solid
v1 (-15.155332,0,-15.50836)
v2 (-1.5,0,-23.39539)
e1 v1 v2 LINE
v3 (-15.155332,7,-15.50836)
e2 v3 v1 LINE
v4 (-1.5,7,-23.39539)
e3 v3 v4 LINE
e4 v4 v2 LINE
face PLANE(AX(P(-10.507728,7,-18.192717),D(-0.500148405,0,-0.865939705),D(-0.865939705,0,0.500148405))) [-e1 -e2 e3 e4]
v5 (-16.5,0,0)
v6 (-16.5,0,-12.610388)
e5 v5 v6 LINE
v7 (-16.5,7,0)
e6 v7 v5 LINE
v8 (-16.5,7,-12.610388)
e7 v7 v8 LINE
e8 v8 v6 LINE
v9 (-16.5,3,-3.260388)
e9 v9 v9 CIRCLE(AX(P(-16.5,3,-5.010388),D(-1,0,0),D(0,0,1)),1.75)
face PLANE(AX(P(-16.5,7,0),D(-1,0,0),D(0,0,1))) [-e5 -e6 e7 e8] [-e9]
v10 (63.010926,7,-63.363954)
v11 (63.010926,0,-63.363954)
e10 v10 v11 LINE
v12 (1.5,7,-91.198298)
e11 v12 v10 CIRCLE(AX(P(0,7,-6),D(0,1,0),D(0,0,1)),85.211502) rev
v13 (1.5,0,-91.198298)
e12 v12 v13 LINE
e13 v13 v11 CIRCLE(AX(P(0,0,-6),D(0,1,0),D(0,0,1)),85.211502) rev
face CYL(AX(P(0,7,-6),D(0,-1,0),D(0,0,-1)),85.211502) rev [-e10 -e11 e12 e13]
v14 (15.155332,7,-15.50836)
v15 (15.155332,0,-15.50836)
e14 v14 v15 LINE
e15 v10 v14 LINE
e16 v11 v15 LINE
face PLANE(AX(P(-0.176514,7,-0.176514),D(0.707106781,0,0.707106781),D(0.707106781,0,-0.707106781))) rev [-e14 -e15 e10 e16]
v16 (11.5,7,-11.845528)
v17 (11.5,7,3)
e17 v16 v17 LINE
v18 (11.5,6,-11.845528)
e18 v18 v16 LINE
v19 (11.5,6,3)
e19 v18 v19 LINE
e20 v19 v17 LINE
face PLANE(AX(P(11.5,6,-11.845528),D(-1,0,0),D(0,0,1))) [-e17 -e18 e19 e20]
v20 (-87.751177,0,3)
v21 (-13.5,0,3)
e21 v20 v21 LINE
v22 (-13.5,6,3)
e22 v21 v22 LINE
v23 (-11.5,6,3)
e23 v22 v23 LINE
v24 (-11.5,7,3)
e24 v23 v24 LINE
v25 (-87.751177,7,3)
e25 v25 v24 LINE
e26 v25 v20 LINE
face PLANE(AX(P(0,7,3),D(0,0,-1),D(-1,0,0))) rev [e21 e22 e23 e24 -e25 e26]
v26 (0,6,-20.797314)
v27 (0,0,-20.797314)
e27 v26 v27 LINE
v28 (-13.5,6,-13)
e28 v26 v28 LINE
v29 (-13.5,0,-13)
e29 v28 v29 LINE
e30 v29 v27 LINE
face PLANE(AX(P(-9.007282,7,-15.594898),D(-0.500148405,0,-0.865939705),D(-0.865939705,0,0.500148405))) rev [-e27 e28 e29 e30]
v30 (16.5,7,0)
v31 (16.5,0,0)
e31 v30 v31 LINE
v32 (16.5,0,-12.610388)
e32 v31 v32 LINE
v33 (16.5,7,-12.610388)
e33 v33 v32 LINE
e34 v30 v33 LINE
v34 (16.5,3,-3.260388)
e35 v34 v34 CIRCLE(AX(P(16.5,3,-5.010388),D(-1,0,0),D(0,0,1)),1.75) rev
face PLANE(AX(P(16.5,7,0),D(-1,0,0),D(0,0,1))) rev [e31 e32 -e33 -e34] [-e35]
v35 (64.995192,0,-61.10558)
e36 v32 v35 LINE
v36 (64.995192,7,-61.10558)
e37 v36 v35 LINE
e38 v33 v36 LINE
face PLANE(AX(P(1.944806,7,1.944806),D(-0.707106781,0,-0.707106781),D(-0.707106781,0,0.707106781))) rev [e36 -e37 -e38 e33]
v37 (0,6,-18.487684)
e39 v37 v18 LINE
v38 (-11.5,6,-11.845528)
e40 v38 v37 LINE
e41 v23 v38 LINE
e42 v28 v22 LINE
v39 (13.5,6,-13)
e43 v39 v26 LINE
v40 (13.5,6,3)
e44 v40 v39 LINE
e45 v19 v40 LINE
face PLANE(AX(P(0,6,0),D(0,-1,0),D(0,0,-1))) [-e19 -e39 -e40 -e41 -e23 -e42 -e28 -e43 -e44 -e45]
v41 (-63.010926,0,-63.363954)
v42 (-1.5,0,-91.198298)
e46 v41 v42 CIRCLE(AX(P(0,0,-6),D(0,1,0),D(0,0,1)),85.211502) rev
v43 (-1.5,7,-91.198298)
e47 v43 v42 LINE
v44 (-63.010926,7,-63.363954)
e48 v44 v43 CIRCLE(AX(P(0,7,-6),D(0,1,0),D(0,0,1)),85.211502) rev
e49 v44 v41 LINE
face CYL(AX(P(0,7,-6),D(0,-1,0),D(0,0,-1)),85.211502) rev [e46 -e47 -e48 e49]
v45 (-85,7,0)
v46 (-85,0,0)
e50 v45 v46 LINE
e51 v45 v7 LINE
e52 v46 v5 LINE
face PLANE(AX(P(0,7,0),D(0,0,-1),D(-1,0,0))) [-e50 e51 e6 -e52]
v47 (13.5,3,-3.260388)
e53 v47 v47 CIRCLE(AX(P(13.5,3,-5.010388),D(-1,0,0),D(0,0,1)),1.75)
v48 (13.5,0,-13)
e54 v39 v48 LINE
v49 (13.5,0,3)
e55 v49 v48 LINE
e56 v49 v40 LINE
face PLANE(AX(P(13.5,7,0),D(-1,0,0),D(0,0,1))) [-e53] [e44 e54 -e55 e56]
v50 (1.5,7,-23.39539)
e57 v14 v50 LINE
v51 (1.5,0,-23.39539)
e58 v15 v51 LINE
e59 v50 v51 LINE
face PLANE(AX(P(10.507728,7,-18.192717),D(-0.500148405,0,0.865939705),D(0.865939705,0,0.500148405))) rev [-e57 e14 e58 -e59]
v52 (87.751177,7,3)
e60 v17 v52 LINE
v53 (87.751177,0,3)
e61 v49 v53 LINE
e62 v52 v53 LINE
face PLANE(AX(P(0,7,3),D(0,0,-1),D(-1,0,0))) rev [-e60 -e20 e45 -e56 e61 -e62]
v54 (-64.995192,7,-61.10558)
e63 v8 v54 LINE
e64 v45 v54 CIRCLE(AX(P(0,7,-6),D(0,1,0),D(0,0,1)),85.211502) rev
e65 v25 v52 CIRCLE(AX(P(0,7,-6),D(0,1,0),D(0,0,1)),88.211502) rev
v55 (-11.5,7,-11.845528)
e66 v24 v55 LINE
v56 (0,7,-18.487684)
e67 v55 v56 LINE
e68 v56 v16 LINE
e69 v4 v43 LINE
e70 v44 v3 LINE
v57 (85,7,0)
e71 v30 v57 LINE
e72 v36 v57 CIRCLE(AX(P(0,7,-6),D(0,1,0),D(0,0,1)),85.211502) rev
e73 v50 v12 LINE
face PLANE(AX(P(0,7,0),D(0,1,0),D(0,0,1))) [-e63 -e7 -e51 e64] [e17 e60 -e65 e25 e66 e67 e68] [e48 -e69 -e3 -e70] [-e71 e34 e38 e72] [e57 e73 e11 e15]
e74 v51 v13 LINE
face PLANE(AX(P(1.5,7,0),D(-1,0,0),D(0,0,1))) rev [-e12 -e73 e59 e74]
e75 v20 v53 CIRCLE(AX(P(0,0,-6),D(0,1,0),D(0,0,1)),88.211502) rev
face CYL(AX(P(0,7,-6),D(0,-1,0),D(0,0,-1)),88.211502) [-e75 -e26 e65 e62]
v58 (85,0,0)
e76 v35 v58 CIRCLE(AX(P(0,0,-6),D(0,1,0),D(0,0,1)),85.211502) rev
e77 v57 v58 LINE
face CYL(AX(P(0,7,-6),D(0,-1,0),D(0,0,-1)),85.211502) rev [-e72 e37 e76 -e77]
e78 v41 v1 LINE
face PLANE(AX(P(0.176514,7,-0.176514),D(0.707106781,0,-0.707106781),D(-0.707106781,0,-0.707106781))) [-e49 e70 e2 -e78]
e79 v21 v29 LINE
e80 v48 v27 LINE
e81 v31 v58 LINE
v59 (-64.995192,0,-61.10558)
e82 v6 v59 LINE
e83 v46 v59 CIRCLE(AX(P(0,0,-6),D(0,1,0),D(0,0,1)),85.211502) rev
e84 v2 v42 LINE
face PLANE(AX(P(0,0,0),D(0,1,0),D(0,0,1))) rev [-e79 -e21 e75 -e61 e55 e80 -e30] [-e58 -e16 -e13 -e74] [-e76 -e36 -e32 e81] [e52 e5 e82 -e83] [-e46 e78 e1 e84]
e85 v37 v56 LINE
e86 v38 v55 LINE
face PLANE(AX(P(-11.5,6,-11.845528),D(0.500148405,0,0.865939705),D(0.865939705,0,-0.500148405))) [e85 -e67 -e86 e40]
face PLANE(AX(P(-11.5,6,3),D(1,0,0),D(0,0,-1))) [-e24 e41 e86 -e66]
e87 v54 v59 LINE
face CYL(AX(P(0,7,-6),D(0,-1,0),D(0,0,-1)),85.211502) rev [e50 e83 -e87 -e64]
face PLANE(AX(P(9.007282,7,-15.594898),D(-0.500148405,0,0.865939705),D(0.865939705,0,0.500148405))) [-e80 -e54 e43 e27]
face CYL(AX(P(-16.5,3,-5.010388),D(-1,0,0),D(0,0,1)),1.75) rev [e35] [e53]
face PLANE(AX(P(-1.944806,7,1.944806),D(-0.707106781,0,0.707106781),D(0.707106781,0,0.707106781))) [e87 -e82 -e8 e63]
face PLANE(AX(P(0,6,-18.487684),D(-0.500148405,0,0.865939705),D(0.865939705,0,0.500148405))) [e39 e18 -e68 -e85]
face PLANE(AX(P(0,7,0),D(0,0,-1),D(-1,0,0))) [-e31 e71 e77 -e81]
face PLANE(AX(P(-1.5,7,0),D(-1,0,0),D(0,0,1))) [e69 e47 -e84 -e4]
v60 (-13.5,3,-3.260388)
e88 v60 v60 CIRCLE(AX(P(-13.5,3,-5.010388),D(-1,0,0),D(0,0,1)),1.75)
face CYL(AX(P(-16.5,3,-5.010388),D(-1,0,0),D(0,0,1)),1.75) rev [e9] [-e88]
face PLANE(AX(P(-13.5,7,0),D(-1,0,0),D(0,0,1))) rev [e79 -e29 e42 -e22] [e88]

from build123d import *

# Parameters (mm, degrees)
BOSS_EXTRUDE2_DEPTH                = 7
SKETCH3_W                          = 27
SKETCH3_H                          = 3
CUT_EXTRUDE2_DEPTH                 = 10
F_3_5_START                        = -16.5
F_3_5_3_5_DIAMETER_HOLE1_OUTLINE_R = 1.75
F_3_5_3_5_DIAMETER_HOLE1_DEPTH     = 33
BOSS_EXTRUDE4_DEPTH                = 1


# Read off the part's stored shape, not the designer's step: Ø3.5 (3.5) Diameter Hole1
with BuildPart() as part:
    # Sketch1 → Boss-Extrude2 (new body)
    # profile 1 of 5: a face of its own
    with BuildSketch(Plane(origin=(0, 0, 0), x_dir=(1, 0, 0), z_dir=(0, 1, 0))):
        with BuildLine():
            ThreePointArc((87.751176684, -3), (0, 94.211501571), (-87.751176684, -3))
            Line((-87.751176684, -3), (87.751176684, -3))
        make_face()
        with BuildLine():
            Line((-16.5, 0), (-85, 0))
            ThreePointArc((-85, 0), (-80.982173458, 32.512027121), (-64.995192411, 61.105580148))
            ThreePointArc((-64.995192411, 61.105580148), (-64.013019257, 62.243518432), (-63.01092574, 63.363954164))
            ThreePointArc((-63.01092574, 63.363954164), (-35.129795909, 83.633095001), (-1.5, 91.198298105))
            ThreePointArc((-1.5, 91.198298105), (0, 91.211501571), (1.5, 91.198298105))
            ThreePointArc((1.5, 91.198298105), (35.129795909, 83.633095001), (63.01092574, 63.363954164))
            ThreePointArc((63.01092574, 63.363954164), (64.013019257, 62.243518432), (64.995192411, 61.105580148))
            ThreePointArc((64.995192411, 61.105580148), (80.982173458, 32.512027121), (85, 0))
            Line((85, 0), (16.5, 0))
            Line((16.5, 0), (13.5, 0))
            Line((13.5, 0), (-13.5, 0))
            Line((-13.5, 0), (-16.5, 0))
        make_face(mode=Mode.SUBTRACT)
    # profile 2 of 5: a face of its own
    with BuildSketch(Plane(origin=(0, 0, 0), x_dir=(1, 0, 0), z_dir=(0, 1, 0))):
        with BuildLine():
            Line((16.5, 14.73170808), (16.5, 12.610387736))
            Line((16.5, 12.610387736), (64.995192411, 61.105580148))
            ThreePointArc((64.995192411, 61.105580148), (64.013019257, 62.243518432), (63.01092574, 63.363954164))
            Line((63.01092574, 63.363954164), (15.155331601, 15.508360024))
            Line((15.155331601, 15.508360024), (16.5, 14.73170808))
        make_face()
    # profile 3 of 5: a face of its own
    with BuildSketch(Plane(origin=(0, 0, 0), x_dir=(1, 0, 0), z_dir=(0, 1, 0))):
        with BuildLine():
            ThreePointArc((1.5, 91.198298105), (0, 91.211501571), (-1.5, 91.198298105))
            Line((-1.5, 91.198298105), (-1.5, 23.395389902))
            Line((-1.5, 23.395389902), (0, 24.261758084))
            Line((0, 24.261758084), (1.5, 23.395389902))
            Line((1.5, 23.395389902), (1.5, 91.198298105))
        make_face()
    # profile 4 of 5: a face of its own
    with BuildSketch(Plane(origin=(0, 0, 0), x_dir=(1, 0, 0), z_dir=(0, 1, 0))):
        with BuildLine():
            ThreePointArc((-63.01092574, 63.363954164), (-64.013019257, 62.243518432), (-64.995192411, 61.105580148))
            Line((-64.995192411, 61.105580148), (-16.5, 12.610387736))
            Line((-16.5, 12.610387736), (-16.5, 14.73170808))
            Line((-16.5, 14.73170808), (-15.155331601, 15.508360024))
            Line((-15.155331601, 15.508360024), (-63.01092574, 63.363954164))
        make_face()
    # profile 5 of 5: a face of its own
    with BuildSketch(Plane(origin=(0, 0, 0), x_dir=(1, 0, 0), z_dir=(0, 1, 0))):
        Polygon((-16.5, 12.610387736), (-16.5, 0), (-13.5, 0), (-13.5, 13), (0, 20.79731364), (13.5, 13), (13.5, 0), (16.5, 0), (16.5, 12.610387736), (16.5, 14.73170808), (15.155331601, 15.508360024), (1.5, 23.395389902), (0, 24.261758084), (-1.5, 23.395389902), (-15.155331601, 15.508360024), (-16.5, 14.73170808), align=None)
    extrude(amount=BOSS_EXTRUDE2_DEPTH)

    # Sketch3 → Cut-Extrude2 (cut)
    with BuildSketch(Plane(origin=(0, 7, 0), x_dir=(1, 0, 0), z_dir=(0, 1, 0))):
        with Locations((0, -1.5)):
            Rectangle(SKETCH3_W, SKETCH3_H)
    extrude(amount=-CUT_EXTRUDE2_DEPTH, mode=Mode.SUBTRACT)

    # Ø3.5 (3.5) Diameter Hole1 outline → Ø3.5 (3.5) Diameter Hole1 (cut)
    with BuildSketch(Plane.YZ.offset(F_3_5_START)):
        with Locations((3, -5.010387736)):
            Circle(F_3_5_3_5_DIAMETER_HOLE1_OUTLINE_R)
    extrude(amount=F_3_5_3_5_DIAMETER_HOLE1_DEPTH, mode=Mode.SUBTRACT)

    # Sketch6 → Boss-Extrude4 (add)
    with BuildSketch(Plane(origin=(0, 7, 0), x_dir=(1, 0, 0), z_dir=(0, 1, 0))):
        Polygon((11.5, 11.845527947), (11.5, -3), (13.5, -3), (13.5, 13), (0, 20.79731364), (-13.5, 13), (-13.5, -3), (-11.5, -3), (-11.5, 11.845527947), (0, 18.48768401), align=None)
    extrude(amount=-BOSS_EXTRUDE4_DEPTH)


solid = part.part
